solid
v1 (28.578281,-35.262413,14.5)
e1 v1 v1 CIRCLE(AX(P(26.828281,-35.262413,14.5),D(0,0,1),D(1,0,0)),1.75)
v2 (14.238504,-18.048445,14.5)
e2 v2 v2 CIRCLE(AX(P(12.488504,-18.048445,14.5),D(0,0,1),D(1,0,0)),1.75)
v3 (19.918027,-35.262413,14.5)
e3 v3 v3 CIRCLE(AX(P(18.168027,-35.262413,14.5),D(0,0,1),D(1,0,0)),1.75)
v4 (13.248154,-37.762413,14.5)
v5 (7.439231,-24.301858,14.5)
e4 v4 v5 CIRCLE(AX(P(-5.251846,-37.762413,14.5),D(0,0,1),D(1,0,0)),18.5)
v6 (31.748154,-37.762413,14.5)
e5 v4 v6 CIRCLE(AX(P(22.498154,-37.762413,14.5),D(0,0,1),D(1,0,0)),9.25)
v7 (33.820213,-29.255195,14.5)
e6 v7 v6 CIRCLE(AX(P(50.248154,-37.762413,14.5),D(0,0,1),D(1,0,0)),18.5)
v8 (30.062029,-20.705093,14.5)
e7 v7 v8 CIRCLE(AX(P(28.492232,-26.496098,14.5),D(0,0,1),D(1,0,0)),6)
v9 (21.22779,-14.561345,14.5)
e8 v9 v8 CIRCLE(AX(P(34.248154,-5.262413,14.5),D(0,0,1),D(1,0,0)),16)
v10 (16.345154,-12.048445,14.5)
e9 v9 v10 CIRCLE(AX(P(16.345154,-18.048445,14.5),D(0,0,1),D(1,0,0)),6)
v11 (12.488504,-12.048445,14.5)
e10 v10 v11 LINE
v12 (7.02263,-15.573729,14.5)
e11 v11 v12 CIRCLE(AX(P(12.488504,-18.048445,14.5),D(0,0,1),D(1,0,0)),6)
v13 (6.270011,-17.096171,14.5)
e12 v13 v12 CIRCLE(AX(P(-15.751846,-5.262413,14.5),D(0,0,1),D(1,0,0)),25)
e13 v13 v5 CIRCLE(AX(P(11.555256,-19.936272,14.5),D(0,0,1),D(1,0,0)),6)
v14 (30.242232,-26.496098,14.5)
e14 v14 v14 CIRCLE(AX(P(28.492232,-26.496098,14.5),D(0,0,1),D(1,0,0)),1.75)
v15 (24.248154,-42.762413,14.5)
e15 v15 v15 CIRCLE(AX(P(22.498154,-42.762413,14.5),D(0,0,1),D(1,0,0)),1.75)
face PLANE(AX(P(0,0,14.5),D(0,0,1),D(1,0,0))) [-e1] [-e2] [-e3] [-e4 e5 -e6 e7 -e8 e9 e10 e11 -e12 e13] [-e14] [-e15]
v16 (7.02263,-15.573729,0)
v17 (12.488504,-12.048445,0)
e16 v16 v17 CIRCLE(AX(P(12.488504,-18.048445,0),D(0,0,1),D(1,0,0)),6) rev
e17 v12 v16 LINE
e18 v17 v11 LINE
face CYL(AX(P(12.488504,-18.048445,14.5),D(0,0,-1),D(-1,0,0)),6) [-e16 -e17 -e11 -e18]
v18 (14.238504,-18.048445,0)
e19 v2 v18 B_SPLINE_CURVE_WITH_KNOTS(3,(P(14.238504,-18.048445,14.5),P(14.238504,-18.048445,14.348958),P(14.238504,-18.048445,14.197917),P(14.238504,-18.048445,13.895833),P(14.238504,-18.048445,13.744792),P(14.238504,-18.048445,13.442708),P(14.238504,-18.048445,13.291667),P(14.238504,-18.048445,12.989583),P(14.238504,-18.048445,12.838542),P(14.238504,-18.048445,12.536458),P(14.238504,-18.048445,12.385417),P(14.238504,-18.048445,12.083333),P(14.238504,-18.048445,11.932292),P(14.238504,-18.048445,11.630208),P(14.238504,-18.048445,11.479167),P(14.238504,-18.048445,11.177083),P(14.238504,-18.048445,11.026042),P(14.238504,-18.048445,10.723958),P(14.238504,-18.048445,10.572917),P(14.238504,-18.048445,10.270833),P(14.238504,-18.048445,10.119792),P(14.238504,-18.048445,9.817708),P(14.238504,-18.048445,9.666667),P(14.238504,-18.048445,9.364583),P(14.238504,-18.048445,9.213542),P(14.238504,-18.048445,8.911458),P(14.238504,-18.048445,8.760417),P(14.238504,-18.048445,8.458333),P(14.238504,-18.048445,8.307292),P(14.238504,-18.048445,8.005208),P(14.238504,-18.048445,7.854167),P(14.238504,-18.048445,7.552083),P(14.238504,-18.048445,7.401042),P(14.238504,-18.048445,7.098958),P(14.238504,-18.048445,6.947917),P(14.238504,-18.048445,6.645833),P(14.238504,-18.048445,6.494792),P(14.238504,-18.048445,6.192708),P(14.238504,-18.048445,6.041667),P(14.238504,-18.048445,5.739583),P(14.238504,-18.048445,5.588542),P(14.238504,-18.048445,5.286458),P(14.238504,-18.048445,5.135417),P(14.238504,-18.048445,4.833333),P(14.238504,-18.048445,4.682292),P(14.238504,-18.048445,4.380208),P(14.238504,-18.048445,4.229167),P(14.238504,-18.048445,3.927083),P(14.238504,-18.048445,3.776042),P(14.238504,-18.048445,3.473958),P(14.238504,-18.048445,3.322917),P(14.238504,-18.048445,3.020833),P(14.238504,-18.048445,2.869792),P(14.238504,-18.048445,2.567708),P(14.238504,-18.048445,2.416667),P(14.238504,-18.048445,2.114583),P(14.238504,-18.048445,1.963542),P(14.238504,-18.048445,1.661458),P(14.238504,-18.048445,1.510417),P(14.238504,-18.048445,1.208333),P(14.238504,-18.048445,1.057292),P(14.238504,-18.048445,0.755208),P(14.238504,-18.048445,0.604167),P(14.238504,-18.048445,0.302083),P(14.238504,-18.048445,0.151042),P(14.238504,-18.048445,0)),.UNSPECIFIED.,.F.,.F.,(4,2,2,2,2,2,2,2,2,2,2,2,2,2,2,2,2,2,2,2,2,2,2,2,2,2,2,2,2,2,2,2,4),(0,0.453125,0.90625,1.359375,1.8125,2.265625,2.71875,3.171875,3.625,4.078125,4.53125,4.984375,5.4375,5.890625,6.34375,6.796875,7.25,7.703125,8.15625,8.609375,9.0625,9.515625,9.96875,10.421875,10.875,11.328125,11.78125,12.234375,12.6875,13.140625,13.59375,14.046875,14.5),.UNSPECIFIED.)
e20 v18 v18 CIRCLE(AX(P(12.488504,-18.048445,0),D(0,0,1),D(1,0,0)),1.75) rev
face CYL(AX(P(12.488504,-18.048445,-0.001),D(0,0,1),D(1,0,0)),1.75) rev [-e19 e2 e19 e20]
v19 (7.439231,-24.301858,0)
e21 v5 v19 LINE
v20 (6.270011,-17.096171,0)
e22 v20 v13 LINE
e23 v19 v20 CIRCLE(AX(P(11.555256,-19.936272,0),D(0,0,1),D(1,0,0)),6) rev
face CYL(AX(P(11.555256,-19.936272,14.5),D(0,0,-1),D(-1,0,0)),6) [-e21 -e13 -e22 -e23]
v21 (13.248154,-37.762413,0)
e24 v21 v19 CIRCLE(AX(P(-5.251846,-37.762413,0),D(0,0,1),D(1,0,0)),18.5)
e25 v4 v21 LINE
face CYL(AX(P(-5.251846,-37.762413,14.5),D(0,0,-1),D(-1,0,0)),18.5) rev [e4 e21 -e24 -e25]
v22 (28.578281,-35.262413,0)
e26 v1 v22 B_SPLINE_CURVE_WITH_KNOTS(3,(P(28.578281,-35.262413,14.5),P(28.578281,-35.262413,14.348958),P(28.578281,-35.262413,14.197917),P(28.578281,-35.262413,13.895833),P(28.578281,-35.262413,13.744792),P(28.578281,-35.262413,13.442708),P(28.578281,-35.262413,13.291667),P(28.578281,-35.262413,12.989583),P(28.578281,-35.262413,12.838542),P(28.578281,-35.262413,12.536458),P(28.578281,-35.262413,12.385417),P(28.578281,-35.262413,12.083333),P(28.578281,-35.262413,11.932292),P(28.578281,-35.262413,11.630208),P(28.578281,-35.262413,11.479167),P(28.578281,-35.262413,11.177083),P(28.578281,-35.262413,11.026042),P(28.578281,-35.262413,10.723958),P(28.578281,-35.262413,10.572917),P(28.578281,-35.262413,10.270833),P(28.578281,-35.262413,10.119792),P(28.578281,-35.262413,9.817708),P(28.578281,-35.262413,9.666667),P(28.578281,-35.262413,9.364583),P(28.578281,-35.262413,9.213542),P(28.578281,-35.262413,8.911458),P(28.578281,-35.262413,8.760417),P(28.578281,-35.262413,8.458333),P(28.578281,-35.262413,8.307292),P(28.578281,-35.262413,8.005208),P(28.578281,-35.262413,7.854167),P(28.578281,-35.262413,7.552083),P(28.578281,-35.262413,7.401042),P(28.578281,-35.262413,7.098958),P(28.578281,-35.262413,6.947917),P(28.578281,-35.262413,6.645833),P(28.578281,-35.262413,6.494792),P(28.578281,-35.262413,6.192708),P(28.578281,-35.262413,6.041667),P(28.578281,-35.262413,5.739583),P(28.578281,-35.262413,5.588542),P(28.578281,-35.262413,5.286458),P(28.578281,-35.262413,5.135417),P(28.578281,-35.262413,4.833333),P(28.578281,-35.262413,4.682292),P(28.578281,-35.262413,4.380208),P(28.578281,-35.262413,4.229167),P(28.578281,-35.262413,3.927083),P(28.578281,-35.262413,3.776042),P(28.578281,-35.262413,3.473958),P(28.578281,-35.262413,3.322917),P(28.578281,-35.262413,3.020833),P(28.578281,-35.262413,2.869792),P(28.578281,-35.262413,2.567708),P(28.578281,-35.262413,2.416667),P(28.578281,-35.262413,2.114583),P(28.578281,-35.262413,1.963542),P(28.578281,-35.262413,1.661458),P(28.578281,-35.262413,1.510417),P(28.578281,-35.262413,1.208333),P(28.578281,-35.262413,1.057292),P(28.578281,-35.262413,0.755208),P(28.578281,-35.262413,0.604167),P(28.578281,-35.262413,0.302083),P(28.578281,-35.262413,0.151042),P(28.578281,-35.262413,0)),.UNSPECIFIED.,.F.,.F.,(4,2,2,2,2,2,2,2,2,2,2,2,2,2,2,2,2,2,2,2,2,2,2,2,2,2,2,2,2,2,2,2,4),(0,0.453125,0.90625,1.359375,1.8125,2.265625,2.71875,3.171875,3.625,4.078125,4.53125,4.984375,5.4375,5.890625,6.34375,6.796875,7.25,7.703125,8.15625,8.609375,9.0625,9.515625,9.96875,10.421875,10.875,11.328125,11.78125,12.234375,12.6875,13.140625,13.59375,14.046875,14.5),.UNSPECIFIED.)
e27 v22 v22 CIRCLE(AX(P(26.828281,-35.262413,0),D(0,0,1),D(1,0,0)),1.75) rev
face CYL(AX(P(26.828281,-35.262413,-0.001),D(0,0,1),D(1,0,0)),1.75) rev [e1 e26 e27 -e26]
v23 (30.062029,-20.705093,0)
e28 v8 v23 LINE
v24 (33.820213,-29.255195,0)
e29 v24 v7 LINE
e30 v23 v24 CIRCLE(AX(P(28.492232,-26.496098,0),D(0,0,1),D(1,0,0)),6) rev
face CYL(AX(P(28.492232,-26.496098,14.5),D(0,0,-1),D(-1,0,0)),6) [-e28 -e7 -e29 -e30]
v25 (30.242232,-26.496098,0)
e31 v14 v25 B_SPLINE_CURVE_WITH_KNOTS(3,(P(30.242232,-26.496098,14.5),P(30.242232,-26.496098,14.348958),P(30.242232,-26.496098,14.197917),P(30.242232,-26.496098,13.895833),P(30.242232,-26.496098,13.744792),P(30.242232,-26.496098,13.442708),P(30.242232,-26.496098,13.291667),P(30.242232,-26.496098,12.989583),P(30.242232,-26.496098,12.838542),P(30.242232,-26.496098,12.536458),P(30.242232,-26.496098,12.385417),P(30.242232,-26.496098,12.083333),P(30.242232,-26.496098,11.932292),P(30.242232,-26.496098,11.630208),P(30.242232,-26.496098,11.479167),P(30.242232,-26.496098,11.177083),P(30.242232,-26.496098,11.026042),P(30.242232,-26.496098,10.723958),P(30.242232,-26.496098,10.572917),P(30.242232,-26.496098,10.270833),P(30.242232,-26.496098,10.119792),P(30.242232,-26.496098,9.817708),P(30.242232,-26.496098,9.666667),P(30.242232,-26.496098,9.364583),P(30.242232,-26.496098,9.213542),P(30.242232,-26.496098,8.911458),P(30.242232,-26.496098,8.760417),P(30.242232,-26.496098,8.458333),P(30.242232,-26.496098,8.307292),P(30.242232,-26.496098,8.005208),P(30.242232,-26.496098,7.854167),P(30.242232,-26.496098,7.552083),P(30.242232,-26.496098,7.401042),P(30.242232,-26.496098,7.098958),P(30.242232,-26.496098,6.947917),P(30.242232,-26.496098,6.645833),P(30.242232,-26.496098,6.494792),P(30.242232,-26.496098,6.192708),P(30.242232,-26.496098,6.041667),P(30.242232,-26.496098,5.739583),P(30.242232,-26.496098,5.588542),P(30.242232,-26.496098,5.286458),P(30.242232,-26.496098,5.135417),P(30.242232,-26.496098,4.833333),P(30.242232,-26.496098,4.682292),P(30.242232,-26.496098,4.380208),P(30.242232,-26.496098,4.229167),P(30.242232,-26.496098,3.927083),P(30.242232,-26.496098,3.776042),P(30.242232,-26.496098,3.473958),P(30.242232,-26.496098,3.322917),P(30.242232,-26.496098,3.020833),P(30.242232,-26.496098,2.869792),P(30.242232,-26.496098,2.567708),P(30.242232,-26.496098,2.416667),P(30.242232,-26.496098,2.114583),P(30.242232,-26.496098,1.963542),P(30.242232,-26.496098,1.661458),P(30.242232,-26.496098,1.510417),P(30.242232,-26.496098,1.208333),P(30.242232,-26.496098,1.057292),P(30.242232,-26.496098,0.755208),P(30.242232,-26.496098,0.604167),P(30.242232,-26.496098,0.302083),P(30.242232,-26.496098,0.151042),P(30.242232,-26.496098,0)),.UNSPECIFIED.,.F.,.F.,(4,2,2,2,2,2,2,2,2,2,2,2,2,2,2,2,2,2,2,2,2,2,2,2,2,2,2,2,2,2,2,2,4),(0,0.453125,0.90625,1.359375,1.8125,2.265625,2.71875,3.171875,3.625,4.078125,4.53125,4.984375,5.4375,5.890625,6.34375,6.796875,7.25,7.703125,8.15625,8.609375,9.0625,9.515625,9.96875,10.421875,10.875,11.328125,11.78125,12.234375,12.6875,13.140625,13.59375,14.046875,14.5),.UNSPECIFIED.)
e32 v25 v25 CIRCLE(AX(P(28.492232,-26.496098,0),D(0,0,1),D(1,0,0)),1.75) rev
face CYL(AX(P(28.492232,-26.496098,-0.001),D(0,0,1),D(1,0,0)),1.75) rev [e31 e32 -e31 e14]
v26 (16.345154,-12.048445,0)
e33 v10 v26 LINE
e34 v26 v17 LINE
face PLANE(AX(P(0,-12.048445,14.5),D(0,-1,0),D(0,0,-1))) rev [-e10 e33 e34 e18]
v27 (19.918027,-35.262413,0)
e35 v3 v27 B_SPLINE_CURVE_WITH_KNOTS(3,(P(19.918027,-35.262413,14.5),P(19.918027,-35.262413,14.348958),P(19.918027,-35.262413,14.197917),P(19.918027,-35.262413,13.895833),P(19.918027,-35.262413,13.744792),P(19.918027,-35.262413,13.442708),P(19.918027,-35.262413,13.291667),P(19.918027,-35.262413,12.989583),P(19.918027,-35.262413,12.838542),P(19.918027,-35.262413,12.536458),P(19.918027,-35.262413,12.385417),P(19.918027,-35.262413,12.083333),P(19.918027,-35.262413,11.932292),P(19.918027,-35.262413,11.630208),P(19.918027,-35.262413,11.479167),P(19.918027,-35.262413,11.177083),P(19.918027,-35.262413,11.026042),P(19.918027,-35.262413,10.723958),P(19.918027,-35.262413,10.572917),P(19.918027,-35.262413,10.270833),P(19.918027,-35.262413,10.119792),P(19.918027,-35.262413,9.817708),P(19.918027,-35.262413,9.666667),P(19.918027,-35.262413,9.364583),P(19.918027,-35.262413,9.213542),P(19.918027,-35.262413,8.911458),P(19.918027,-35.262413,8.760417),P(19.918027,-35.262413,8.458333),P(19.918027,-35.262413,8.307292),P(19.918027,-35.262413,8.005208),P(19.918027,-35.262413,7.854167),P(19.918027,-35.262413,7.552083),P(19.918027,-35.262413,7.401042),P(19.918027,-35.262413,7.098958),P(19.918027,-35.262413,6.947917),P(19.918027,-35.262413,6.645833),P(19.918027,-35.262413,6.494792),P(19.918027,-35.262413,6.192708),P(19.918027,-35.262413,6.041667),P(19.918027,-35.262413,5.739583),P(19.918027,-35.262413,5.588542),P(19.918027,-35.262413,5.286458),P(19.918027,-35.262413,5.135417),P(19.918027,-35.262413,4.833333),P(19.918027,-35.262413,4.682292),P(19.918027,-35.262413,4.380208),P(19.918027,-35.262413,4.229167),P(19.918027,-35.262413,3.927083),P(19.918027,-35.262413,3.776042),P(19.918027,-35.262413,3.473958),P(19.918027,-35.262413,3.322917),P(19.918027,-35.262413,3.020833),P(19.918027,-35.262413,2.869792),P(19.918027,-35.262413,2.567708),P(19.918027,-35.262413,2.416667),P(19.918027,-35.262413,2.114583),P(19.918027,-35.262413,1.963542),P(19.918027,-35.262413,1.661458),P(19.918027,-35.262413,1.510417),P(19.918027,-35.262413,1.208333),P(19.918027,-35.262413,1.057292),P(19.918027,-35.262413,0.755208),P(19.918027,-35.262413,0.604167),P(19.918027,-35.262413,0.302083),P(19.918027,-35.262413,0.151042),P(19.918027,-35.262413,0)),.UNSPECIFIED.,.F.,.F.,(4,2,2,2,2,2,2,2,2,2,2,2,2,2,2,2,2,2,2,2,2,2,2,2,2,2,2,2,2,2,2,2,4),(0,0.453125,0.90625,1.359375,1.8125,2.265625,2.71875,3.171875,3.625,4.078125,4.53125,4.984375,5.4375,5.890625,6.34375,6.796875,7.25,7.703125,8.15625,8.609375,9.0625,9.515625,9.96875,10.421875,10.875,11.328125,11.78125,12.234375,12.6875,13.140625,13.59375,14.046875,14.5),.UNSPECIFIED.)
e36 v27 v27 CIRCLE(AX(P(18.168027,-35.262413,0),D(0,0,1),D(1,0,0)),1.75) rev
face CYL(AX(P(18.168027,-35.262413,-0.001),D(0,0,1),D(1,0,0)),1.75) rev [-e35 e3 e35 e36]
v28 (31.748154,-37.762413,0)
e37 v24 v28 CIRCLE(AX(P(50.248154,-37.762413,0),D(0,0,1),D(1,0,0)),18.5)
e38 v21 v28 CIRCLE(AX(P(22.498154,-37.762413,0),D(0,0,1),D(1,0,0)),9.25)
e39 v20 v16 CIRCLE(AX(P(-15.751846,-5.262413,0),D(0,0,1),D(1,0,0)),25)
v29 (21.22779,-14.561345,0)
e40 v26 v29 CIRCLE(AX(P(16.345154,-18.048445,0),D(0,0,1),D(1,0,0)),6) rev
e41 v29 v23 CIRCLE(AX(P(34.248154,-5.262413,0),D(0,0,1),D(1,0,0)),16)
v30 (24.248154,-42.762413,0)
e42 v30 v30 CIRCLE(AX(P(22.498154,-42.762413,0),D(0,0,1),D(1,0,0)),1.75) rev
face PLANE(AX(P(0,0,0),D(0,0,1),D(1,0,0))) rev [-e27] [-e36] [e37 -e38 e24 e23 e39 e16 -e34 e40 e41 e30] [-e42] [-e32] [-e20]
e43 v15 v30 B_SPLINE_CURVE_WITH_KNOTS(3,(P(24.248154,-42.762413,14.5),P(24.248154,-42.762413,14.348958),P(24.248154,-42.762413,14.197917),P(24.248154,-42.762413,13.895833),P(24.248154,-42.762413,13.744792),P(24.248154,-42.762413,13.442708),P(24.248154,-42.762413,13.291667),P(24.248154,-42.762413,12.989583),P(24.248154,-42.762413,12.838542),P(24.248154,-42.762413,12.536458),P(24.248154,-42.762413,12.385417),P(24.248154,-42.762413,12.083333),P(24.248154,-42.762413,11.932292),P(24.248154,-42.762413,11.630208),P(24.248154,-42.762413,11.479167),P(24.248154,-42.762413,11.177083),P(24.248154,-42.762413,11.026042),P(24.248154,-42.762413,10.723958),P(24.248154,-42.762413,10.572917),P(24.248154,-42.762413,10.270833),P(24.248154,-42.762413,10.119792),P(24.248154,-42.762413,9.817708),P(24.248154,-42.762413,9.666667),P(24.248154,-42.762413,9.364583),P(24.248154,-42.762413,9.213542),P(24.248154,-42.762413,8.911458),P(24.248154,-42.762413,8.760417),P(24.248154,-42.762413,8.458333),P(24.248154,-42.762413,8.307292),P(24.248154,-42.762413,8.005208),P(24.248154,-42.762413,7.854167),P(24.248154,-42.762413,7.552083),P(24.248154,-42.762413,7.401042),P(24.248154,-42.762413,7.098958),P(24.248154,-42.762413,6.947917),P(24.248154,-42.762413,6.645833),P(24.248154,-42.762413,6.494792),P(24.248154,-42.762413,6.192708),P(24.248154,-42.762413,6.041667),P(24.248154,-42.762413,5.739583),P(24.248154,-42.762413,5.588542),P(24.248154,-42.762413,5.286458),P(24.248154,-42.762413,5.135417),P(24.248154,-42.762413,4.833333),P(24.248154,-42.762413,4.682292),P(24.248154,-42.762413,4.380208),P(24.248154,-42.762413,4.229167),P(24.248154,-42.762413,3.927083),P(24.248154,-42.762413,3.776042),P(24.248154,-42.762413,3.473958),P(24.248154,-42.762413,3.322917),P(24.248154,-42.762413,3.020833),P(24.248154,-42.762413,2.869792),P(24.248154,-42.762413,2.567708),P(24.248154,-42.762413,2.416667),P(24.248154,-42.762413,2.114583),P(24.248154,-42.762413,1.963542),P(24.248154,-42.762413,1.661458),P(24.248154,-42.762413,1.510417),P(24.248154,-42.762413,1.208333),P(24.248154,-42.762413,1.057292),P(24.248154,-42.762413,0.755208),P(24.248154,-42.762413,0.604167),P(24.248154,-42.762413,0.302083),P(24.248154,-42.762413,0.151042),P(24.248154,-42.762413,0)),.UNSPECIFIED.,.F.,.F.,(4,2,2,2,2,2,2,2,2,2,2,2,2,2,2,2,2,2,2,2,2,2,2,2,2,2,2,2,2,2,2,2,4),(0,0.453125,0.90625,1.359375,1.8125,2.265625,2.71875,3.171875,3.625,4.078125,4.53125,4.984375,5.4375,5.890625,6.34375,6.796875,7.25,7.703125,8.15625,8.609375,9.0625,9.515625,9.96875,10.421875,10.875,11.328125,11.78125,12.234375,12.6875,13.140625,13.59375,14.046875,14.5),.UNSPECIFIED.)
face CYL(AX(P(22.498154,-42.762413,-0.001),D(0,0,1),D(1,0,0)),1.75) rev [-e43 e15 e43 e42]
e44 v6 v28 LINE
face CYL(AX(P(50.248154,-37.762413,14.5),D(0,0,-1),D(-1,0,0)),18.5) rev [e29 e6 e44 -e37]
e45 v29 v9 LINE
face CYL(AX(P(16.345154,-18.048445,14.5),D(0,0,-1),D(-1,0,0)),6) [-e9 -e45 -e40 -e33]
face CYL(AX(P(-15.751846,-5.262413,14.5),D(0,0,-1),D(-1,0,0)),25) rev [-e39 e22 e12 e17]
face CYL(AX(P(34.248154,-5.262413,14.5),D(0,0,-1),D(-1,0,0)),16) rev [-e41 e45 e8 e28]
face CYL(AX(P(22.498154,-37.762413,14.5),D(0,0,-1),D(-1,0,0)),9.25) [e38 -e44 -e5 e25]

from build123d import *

# Parameters (mm, degrees)
EXTRUDE_2_DEPTH     = 14.5
FILLET_2_R          = 6
CUT_EXTRUDE_1_REACH = 62.084
SKETCH_2_R          = 1.75


with BuildPart() as part:
    # 草图1 → 凸台-拉伸2 (new body)
    with BuildSketch(Plane(origin=(0, 0, 0), x_dir=(-1, 0, 0), z_dir=(0, 0, 1))):
        with BuildLine():
            Line((-37.405308562, 24.446583048), (-45.355478911, 16.778806877))
            ThreePointArc((-45.355478911, 16.778806877), (-31.34055986, 20.996004639), (-19.758509765, 12.048444717))
            Line((-19.758509765, 12.048444717), (-8.309528731, 12.048444717))
            ThreePointArc((-8.309528731, 12.048444717), (-6.330928861, 16.982098954), (-3.353982561, 21.385914608))
            ThreePointArc((-3.353982561, 21.385914608), (-10.582575483, 28.195748099), (-13.248153532, 37.762413217))
            ThreePointArc((-13.248153532, 37.762413217), (-22.498153532, 47.012413217), (-31.748153532, 37.762413217))
            ThreePointArc((-31.748153532, 37.762413217), (-33.221077565, 30.528556429), (-37.405308562, 24.446583048))
        make_face()
    extrude(amount=EXTRUDE_2_DEPTH)

    # 圆角2
    fillet_2_edges = [part.edges().sort_by_distance(p)[0] for p in [
        (19.758509765, -12.048444717, 7.25),
    ]]
    fillet(fillet_2_edges, radius=FILLET_2_R)
    fillet_2_2_edges = [part.edges().sort_by_distance(p)[0] for p in [
        (8.309528731, -12.048444717, 7.25),
    ]]
    fillet(fillet_2_2_edges, radius=FILLET_2_R)
    fillet_2_3_edges = [part.edges().sort_by_distance(p)[0] for p in [
        (3.353982561, -21.385914608, 7.25),
    ]]
    fillet(fillet_2_3_edges, radius=FILLET_2_R)
    fillet_2_4_edges = [part.edges().sort_by_distance(p)[0] for p in [
        (45.355478911, -16.778806877, 7.25),
    ]]
    fillet(fillet_2_4_edges, radius=FILLET_2_R)

    # 草图2 → 切除-拉伸1 (cut, up to next)
    with BuildSketch(Plane.XY.offset(14.5), mode=Mode.PRIVATE) as cut_extrude_1_sk1:
        with Locations((22.498153532, -42.762413217)):
            Circle(SKETCH_2_R)
    cut_extrude_1_tool1 = extrude(cut_extrude_1_sk1.sketch, amount=-CUT_EXTRUDE_1_REACH, mode=Mode.PRIVATE) & part.part
    # 草图2 → 切除-拉伸1 (cut, up to next)
    with BuildSketch(Plane.XY.offset(14.5), mode=Mode.PRIVATE) as cut_extrude_1_sk2:
        with Locations((18.168026513, -35.262413217)):
            Circle(SKETCH_2_R)
    cut_extrude_1_tool2 = extrude(cut_extrude_1_sk2.sketch, amount=-CUT_EXTRUDE_1_REACH, mode=Mode.PRIVATE) & part.part
    # 草图2 → 切除-拉伸1 (cut, up to next)
    with BuildSketch(Plane.XY.offset(14.5), mode=Mode.PRIVATE) as cut_extrude_1_sk3:
        with Locations((26.828280551, -35.262413217)):
            Circle(SKETCH_2_R)
    cut_extrude_1_tool3 = extrude(cut_extrude_1_sk3.sketch, amount=-CUT_EXTRUDE_1_REACH, mode=Mode.PRIVATE) & part.part
    # 草图2 → 切除-拉伸1 (cut, up to next)
    with BuildSketch(Plane.XY.offset(14.5), mode=Mode.PRIVATE) as cut_extrude_1_sk4:
        with Locations((28.492231625, -26.496097848)):
            Circle(SKETCH_2_R)
    cut_extrude_1_tool4 = extrude(cut_extrude_1_sk4.sketch, amount=-CUT_EXTRUDE_1_REACH, mode=Mode.PRIVATE) & part.part
    # 草图2 → 切除-拉伸1 (cut, up to next)
    with BuildSketch(Plane.XY.offset(14.5), mode=Mode.PRIVATE) as cut_extrude_1_sk5:
        with Locations((12.488504069, -18.048444717)):
            Circle(SKETCH_2_R)
    cut_extrude_1_tool5 = extrude(cut_extrude_1_sk5.sketch, amount=-CUT_EXTRUDE_1_REACH, mode=Mode.PRIVATE) & part.part
    add(cut_extrude_1_tool1.solids().sort_by_distance((22.498154, -42.762413, 14.5))[0], mode=Mode.SUBTRACT)
    add(cut_extrude_1_tool2.solids().sort_by_distance((18.168027, -35.262413, 14.5))[0], mode=Mode.SUBTRACT)
    add(cut_extrude_1_tool3.solids().sort_by_distance((26.828281, -35.262413, 14.5))[0], mode=Mode.SUBTRACT)
    add(cut_extrude_1_tool4.solids().sort_by_distance((28.492232, -26.496098, 14.5))[0], mode=Mode.SUBTRACT)
    add(cut_extrude_1_tool5.solids().sort_by_distance((12.488504, -18.048445, 14.5))[0], mode=Mode.SUBTRACT)


solid = part.part
